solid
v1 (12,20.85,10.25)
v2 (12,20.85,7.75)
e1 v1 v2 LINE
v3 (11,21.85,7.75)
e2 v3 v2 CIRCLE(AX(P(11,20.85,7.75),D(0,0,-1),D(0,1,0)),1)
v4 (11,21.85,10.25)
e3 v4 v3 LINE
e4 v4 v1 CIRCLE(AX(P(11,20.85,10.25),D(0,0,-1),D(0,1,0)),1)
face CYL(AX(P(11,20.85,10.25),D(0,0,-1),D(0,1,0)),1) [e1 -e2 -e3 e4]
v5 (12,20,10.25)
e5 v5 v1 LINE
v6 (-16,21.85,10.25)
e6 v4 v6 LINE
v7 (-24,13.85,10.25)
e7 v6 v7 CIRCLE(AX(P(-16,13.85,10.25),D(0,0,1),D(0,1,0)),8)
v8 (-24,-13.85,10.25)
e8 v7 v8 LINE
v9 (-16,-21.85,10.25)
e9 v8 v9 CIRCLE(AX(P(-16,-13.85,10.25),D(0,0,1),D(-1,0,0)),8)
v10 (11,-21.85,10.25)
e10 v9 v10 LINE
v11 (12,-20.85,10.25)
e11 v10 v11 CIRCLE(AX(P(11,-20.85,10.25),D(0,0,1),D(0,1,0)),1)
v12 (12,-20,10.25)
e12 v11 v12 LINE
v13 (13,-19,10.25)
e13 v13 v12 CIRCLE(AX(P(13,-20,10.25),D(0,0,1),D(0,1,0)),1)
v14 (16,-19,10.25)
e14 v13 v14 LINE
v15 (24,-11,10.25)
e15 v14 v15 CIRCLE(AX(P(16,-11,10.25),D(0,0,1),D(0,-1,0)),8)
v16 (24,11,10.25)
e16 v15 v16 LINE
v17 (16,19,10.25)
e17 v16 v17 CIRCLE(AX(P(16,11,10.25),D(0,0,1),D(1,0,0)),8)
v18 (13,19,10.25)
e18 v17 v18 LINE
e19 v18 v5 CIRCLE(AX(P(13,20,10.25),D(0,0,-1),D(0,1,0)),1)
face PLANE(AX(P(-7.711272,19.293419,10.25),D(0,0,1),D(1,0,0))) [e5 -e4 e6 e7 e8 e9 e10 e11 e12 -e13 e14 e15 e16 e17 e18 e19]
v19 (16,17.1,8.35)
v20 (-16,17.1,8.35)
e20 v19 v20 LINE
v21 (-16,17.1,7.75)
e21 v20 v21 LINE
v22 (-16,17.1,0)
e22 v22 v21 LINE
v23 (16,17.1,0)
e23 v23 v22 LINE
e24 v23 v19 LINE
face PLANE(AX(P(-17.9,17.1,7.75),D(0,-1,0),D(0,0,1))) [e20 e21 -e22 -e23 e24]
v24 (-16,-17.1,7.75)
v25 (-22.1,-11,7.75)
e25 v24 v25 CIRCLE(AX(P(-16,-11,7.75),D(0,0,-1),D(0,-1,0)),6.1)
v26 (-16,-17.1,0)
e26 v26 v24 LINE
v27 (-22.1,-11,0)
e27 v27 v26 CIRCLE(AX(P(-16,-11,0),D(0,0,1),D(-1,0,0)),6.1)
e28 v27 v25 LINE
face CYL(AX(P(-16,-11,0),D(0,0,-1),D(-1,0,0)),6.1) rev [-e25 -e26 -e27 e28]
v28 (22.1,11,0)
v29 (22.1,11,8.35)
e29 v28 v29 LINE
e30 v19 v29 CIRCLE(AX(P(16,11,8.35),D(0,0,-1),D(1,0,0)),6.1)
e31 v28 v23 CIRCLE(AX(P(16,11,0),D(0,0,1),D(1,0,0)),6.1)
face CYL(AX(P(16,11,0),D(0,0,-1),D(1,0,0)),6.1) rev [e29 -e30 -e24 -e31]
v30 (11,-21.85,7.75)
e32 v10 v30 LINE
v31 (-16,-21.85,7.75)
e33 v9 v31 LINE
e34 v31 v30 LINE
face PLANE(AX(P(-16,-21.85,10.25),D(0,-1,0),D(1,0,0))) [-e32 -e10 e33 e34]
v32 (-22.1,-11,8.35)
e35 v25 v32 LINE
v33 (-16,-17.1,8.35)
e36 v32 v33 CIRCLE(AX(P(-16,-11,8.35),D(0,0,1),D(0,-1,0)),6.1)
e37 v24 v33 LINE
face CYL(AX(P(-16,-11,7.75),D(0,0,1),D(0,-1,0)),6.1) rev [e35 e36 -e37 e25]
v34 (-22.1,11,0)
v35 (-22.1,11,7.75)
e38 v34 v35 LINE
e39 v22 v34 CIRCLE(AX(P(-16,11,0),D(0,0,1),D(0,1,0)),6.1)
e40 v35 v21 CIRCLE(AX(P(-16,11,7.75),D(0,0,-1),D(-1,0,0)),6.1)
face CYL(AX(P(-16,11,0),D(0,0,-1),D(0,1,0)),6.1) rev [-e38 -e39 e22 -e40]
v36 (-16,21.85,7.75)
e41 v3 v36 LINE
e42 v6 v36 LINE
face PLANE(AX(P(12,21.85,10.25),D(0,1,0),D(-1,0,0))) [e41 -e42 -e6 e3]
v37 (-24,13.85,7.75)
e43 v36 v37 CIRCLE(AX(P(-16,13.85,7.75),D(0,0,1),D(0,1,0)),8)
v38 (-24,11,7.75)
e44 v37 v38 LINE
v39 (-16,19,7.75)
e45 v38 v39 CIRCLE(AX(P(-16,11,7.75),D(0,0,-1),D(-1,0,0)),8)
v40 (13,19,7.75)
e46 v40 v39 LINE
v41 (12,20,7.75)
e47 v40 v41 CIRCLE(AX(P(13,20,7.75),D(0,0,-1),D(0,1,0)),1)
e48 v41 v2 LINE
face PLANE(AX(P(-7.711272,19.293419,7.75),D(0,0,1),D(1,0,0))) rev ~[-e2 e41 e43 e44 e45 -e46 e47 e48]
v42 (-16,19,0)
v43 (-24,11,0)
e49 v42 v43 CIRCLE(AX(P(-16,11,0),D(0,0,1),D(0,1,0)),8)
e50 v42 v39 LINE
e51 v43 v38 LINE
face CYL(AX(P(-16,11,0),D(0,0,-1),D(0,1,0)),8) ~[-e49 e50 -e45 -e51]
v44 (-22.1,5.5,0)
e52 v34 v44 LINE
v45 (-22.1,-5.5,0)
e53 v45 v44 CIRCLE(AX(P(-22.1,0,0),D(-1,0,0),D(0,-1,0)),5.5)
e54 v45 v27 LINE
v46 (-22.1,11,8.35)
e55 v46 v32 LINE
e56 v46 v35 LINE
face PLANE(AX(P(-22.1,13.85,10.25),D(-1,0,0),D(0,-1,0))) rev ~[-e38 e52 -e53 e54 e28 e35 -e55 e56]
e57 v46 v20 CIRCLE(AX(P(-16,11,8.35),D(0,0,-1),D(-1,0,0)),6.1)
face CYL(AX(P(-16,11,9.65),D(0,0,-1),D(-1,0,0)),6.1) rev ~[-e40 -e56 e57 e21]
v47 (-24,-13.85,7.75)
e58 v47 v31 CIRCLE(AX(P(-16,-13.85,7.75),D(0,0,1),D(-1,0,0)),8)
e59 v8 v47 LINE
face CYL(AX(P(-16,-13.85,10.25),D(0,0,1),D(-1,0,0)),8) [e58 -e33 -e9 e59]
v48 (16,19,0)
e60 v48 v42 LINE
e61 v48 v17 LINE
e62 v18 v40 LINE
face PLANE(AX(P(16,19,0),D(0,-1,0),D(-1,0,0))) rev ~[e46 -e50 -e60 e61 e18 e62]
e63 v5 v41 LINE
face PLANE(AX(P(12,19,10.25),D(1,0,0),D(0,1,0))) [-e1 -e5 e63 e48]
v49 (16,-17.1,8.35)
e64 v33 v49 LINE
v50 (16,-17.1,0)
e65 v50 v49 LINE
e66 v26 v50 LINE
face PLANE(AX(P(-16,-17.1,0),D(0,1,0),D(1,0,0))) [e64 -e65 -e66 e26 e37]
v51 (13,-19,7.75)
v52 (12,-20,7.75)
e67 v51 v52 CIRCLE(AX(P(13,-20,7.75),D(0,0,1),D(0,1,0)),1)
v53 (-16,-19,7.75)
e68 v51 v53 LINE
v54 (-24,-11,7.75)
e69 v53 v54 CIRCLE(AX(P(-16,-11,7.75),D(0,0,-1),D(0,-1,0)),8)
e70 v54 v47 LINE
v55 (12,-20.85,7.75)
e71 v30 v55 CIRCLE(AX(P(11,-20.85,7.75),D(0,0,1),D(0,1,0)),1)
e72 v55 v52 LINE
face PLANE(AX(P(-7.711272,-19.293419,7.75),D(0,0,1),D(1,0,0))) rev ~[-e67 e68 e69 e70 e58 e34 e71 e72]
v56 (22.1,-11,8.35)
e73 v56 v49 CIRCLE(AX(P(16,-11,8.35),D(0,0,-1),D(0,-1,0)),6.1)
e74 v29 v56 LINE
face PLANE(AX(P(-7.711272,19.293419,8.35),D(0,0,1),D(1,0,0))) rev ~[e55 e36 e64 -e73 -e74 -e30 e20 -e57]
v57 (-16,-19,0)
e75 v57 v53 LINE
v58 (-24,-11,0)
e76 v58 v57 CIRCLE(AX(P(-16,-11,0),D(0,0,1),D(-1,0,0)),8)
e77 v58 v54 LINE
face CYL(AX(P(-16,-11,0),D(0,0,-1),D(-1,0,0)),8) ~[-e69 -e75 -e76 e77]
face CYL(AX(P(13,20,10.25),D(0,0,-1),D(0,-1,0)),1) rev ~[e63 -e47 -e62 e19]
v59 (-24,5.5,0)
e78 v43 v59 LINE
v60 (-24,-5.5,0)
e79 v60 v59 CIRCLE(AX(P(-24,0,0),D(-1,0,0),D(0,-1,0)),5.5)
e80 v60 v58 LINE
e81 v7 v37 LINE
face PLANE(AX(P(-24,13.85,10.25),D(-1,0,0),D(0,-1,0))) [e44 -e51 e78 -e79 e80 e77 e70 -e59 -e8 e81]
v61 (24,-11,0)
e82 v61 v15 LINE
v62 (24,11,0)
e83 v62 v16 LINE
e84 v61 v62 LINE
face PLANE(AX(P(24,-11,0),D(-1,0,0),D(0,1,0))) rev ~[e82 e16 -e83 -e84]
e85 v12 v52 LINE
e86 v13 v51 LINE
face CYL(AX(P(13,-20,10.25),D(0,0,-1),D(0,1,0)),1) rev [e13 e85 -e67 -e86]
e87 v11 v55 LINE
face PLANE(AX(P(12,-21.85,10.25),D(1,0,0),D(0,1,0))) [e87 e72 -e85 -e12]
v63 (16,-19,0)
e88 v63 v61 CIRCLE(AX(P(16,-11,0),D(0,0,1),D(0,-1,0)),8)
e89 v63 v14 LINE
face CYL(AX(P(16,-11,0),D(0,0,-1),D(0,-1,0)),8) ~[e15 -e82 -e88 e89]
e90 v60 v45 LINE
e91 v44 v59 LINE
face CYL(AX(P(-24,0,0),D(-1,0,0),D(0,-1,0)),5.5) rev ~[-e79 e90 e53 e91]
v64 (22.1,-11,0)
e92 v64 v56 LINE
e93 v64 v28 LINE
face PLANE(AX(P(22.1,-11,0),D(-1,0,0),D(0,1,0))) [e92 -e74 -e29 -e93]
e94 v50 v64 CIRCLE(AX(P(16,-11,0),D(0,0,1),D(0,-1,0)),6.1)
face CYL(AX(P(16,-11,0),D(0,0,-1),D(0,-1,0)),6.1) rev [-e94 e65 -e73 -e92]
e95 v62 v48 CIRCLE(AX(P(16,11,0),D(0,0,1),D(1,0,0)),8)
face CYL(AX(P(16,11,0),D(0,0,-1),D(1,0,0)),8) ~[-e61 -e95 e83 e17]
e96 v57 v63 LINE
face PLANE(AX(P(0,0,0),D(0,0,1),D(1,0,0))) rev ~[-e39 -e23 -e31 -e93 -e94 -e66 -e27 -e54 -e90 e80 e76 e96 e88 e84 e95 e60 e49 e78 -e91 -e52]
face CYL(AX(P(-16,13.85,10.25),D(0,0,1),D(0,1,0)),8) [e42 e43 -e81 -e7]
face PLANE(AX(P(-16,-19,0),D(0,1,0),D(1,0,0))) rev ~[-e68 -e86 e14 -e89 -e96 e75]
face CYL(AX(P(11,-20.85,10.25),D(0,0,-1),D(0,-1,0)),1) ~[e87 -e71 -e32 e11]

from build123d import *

# Parameters (mm, degrees)
F1_DEPTH     = 10.25
F3_DEPTH     = 2.5
F4_R         = 1
F5_T         = 1.9
F5_T3_DEPTH  = 4.8
F5_T5_DEPTH  = 31.8
F5_T8_ANGLE  = 90.000000001
F5_T10_ANGLE = 90.000000001
F6_R         = 5.5
F7_DEPTH     = 2


# Not quite as in the source:
# - a shell that OpenCascade refuses in one call is made with other operations: the cavity is built on its own and cut out


with BuildPart() as f1:
    # F0 (on Top) → F1 (new body)
    with BuildSketch(Plane.XY):
        with BuildLine():
            Line((16, 19), (-16, 19))
            ThreePointArc((-16, 19), (-21.6568542495, 16.6568542495), (-24, 11))
            Line((-24, 11), (-24, -11))
            ThreePointArc((-24, -11), (-21.6568542495, -16.6568542495), (-16, -19))
            Line((-16, -19), (16, -19))
            ThreePointArc((16, -19), (21.6568542495, -16.6568542495), (24, -11))
            Line((24, -11), (24, 11))
            ThreePointArc((24, 11), (21.6568542495, 16.6568542495), (16, 19))
        make_face()
    extrude(amount=F1_DEPTH)

    # F2 (on face) → F3 (join)
    with BuildSketch(Plane.XY.offset(10.25)):
        with BuildLine():
            Line((12, 21.85), (-16, 21.85))
            ThreePointArc((-16, 21.85), (-21.6568542495, 19.5068542495), (-24, 13.85))
            Line((-24, 13.85), (-24, 11))
            ThreePointArc((-24, 11), (-21.6568542495, 16.6568542495), (-16, 19))
            Line((-16, 19), (12, 19))
            Line((12, 19), (12, 21.85))
        make_face()
        with BuildLine():
            Line((12, -21.85), (12, -19))
            Line((12, -19), (-16, -19))
            ThreePointArc((-16, -19), (-21.6568542495, -16.6568542495), (-24, -11))
            Line((-24, -11), (-24, -13.85))
            ThreePointArc((-24, -13.85), (-21.6568542495, -19.5068542495), (-16, -21.85))
            Line((-16, -21.85), (12, -21.85))
        make_face()
    extrude(amount=-F3_DEPTH)

    # F4
    f4_edges = [f1.edges().sort_by_distance(p)[0] for p in [
        (12, -21.85, 9),
        (12, -19, 9),
        (12, 19, 9),
        (12, 21.85, 9),
    ]]
    fillet(f4_edges, radius=F4_R)

    # F5: shell of thickness 1.9, made by hand


with BuildPart() as f5_core1:
    # F5_t2: copy of F1
    add(f1.part)

    # the walls: a layer under each face that stays
    f5_faces = [f5_core1.faces().sort_by_distance(p)[0] for p in [
        (0, 19, 5.125),
        (0, 0, 10.25),
        (12.2928932188, 19.2928932188, 9),
        (21.6568542495, 16.6568542495, 5.125),
        (-17.8333333333, 20.0416666667, 7.75),
        (-21.6568542495, 16.6568542495, 3.875),
        (12, 20.425, 9),
        (24, 0, 5.125),
        (21.6568542495, -16.6568542495, 5.125),
        (-2.5, 21.85, 9),
        (0, -19, 5.125),
        (-21.6568542495, 19.5068542495, 9),
        (12.2928932188, -19.2928932188, 9),
        (-24, 0, 5.125),
        (12, -20.425, 9),
        (-21.6568542495, -19.5068542495, 9),
        (-2.5, -21.85, 9),
        (-21.6568542495, -16.6568542495, 3.875),
        (-17.8333333333, -20.0416666667, 7.75),
    ]]
    thicken(f5_faces, amount=-F5_T, mode=Mode.SUBTRACT)

    # F5_s4 → F5_t3 (cut)
    with BuildSketch(Plane.YZ.offset(10.1)):
        Polygon((19.019, 7.731), (17.1, 7.75), (17.1, 9.65), (19, 9.65), align=None)
        Polygon((-19.019, 7.731), (-17.1, 7.75), (-17.1, 9.65), (-19, 9.65), align=None)
    extrude(amount=F5_T3_DEPTH, mode=Mode.SUBTRACT)

    # F5_s6 → F5_t5 (cut)
    with BuildSketch(Plane.YZ.offset(-17.9)):
        Polygon((19.019, 7.731), (17.1, 7.75), (17.1, 9.65), (19, 9.65), align=None)
        Polygon((-19.019, 7.731), (-17.1, 7.75), (-17.1, 9.65), (-19, 9.65), align=None)
    extrude(amount=F5_T5_DEPTH, mode=Mode.SUBTRACT)

    # F5_s7 → F5_t8 (revolve, cut)
    with BuildSketch(Plane.XZ.offset(-11)):
        Polygon((-24.019, 7.731), (-24, 9.65), (-22.1, 9.65), (-22.1, 7.75), align=None)
    revolve(axis=Axis((-16, 11, 7.75), (0, 0, -1)), revolution_arc=F5_T8_ANGLE, mode=Mode.SUBTRACT)

    # F5_s9 → F5_t10 (revolve, cut)
    with BuildSketch(Plane.YZ.offset(-16)):
        Polygon((-19.019, 7.731), (-17.1, 7.75), (-17.1, 9.65), (-19, 9.65), align=None)
    revolve(axis=Axis((-16, -11, 7.75), (0, 0, -1)), revolution_arc=F5_T10_ANGLE, mode=Mode.SUBTRACT)


with BuildPart() as f1_1:
    add(f1.part)

    # what is left inside the walls is the cavity
    f5_cavity = [f5_core1.part.solids().sort_by_distance(p)[0] for p in [
        (0, -5.7, 8.331),
    ]]
    add(f5_cavity, mode=Mode.SUBTRACT)

    # F6 (on face) → F7 (cut)
    with BuildSketch(Plane(origin=(-24, 0, 0), x_dir=(0, -1, 0), z_dir=(-1, 0, 0))):
        Circle(F6_R)
    extrude(amount=-F7_DEPTH, mode=Mode.SUBTRACT)


solid = f1_1.part
